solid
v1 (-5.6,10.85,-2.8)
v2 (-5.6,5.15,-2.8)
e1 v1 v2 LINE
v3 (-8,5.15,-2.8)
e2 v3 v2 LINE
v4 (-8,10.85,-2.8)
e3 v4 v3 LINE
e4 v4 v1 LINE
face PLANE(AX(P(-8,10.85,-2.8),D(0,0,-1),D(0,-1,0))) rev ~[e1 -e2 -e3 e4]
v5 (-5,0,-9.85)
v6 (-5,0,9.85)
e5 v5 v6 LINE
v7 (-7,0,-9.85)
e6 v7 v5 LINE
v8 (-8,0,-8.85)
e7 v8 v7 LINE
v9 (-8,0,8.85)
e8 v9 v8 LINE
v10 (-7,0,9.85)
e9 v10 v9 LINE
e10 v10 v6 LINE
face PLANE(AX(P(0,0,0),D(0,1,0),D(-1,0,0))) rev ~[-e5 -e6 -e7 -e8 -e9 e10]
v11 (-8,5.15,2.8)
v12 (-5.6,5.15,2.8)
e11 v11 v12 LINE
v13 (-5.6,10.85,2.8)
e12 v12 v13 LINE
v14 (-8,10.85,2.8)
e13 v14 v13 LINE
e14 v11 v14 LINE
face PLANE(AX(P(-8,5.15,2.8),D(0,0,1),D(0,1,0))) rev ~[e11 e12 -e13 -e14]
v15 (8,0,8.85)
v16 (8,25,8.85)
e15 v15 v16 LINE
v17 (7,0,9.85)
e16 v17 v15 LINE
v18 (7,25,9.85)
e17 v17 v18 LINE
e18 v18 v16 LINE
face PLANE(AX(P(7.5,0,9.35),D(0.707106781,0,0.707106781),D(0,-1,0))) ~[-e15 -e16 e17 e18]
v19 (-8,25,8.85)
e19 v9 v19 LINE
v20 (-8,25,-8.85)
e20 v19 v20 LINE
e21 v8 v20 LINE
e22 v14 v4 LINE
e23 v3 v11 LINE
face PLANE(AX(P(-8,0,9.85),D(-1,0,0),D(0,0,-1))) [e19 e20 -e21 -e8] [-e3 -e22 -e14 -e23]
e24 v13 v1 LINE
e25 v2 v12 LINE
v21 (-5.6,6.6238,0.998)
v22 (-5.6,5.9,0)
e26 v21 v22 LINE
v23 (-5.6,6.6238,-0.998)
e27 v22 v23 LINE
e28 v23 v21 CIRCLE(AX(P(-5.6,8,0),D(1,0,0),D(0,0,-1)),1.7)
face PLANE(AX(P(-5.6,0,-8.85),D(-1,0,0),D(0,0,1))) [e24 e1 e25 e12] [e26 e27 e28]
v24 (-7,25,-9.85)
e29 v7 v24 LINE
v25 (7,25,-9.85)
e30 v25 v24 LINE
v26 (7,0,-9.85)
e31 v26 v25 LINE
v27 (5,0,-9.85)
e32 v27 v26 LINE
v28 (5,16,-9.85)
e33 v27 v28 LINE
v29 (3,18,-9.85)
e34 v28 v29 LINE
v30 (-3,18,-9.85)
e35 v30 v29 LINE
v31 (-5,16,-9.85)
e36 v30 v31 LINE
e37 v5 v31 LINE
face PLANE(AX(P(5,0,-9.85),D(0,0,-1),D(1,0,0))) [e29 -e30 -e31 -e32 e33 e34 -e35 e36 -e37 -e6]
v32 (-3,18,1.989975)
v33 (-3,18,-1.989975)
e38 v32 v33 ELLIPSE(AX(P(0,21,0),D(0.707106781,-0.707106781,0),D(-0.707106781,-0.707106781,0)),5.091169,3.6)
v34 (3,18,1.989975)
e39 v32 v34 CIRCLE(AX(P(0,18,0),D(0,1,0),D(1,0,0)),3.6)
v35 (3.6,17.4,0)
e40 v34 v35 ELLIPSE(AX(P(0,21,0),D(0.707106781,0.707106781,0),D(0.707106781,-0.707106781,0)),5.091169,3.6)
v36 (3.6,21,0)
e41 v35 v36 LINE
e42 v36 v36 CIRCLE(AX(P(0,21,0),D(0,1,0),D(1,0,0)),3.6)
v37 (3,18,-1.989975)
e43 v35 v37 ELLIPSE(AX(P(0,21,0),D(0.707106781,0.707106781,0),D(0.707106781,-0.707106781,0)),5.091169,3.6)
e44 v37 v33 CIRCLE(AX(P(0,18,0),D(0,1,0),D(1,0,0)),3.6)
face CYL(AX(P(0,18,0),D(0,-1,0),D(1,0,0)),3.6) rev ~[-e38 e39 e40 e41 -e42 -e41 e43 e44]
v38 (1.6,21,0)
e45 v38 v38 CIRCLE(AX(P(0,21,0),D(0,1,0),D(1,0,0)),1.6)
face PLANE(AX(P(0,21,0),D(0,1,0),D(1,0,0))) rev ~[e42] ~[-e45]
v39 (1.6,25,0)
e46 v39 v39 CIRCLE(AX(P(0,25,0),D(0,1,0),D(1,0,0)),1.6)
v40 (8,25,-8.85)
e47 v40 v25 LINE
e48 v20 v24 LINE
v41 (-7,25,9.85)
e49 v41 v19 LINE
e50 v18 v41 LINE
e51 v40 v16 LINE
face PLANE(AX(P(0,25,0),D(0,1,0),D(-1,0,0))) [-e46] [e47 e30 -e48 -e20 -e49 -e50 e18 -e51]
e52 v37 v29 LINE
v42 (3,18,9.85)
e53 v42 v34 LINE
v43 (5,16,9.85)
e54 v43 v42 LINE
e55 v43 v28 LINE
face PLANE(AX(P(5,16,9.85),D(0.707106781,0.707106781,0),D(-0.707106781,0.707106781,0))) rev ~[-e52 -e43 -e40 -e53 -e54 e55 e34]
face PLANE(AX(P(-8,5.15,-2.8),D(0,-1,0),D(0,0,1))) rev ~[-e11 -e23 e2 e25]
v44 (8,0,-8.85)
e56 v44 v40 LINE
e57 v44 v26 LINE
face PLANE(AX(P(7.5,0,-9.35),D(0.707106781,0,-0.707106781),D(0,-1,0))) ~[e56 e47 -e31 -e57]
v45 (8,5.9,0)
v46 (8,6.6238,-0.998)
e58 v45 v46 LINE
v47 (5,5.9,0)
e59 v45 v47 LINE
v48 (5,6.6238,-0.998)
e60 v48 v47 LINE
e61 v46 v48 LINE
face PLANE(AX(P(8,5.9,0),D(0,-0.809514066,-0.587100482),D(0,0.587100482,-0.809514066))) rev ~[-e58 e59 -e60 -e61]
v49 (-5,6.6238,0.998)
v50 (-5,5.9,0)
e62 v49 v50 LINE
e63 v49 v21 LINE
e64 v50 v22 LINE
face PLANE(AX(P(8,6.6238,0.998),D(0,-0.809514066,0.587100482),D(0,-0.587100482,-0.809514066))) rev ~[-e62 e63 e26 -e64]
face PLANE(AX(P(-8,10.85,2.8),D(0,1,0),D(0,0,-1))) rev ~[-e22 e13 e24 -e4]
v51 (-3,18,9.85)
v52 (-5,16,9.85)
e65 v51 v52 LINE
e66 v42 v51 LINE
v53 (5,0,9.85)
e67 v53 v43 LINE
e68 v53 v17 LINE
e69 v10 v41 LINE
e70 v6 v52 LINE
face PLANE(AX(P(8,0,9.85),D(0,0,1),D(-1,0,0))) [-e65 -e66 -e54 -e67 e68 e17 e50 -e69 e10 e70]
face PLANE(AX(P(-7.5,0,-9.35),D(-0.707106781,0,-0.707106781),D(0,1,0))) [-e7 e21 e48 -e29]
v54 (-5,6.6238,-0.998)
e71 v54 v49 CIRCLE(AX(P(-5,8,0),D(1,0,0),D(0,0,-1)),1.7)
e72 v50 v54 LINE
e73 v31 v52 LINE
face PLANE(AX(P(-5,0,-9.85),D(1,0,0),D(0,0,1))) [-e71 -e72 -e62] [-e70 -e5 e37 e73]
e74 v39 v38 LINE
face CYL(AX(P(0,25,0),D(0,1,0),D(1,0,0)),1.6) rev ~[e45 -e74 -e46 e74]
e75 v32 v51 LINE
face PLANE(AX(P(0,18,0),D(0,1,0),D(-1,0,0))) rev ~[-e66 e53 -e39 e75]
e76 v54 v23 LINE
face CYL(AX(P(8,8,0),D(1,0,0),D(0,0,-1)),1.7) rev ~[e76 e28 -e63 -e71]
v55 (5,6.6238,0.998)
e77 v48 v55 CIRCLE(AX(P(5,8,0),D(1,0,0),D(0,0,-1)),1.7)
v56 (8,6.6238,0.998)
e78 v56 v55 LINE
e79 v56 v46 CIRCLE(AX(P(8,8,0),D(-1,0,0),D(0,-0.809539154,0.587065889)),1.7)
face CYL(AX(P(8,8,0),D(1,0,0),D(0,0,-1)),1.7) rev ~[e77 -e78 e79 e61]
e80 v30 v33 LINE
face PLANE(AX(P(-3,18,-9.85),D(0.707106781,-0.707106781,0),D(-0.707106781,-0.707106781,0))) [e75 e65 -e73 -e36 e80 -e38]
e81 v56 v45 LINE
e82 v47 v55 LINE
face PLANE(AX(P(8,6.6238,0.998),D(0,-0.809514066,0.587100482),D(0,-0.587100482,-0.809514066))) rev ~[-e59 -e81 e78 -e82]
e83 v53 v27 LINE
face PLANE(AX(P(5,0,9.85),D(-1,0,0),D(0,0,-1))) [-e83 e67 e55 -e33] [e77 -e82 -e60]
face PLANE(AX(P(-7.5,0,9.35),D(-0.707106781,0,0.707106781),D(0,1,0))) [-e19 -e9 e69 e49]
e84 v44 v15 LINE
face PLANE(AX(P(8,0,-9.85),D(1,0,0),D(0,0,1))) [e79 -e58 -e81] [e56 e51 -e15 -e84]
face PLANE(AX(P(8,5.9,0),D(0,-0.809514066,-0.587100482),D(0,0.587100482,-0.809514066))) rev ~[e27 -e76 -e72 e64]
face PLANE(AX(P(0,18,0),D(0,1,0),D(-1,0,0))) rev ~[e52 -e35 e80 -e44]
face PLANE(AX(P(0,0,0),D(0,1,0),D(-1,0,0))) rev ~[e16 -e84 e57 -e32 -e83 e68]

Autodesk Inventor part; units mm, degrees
ref_plane "YZ Plane" through (0, 0, 0) normal (1, 0, 0) x (0, 1, 0)
ref_plane "XZ Plane" through (0, 0, 0) normal (0, 1, 0) x (-1, 0, 0)
ref_plane "XY Plane" through (0, 0, 0) normal (0, 0, 1) x (1, 0, 0)
sketch "Sketch3" plane through (0, 0, 0) normal (0, 1, 0) x (-1, 0, 0)
  line L0 (-8, 9.85) -> (8, 9.85)
  line L1 (8, 9.85) -> (8, -9.85)
  line L2 (8, -9.85) -> (-8, -9.85)
  line L3 (-8, -9.85) -> (-8, 9.85)
  line L4 (-8, 9.85) -> (8, -9.85) construction
  line L5 (8, 9.85) -> (-8, -9.85) construction
  line L6 (5, -9.85) -> (5, 9.85)
  line L7 (-5, 9.85) -> (-5, -9.85)
  line L8 (-5, -6.1562) -> (5, -6.1562) construction
  point P0 (0, 0)
  dimension "d12" = 19.7
  dimension "d36" = 10
  dimension "d52" = 16
extrude "Extrusion3" add sketch "Sketch3" along normal blind 25
sketch "Sketch4" plane through (8, 0, 9.85) normal (1, 0, 0) x (0, 0, -1)
  line L0 (9.85, 0) -> (9.85, 8) construction
  circle A0 centre (9.85, 8) radius 1.7
  line L1 (0, 0) -> (19.7, 0) projected
  line L2 (9.85, 5.9) -> (10.848, 6.6238)
  line L3 (8.852, 6.6238) -> (9.85, 5.9)
  dimension "d15" = 3.4
  dimension "d16" = 8
  dimension "d53" = 2.1
extrude "Extrusion4" cut sketch "Sketch3" along normal blind 18 contours L0 L6 L2 L7
extrude "Extrusion5" cut sketch "Sketch4" against normal through all
sketch "Sketch7" plane through (0, 25, 0) normal (0, 1, 0) x (1, 0, 0)
  circle A0 centre (0, 0) radius 1.6
  circle A1 centre (0, 0) radius 3.6
  line L0 (-5, 10) -> (5, -10) construction
  line L1 (8, 9.85) -> (-8, 9.85) projected
  line L2 (-8, 9.85) -> (-8, -9.85) projected
  line L3 (-8, -9.85) -> (8, -9.85) projected
  line L4 (8, -9.85) -> (8, 9.85) projected
  line L5 (-8, 9.85) -> (8, -9.85) construction
  line L6 (8, 9.85) -> (-8, -9.85) construction
  dimension "d30" = 3.2
  dimension "d47" = 7.2
extrude "Extrusion8" cut sketch "Sketch7" along normal through all both and the other way through all contours A0
extrude "Extrusion9" cut sketch "Sketch7" along normal blind 3 from surface at -7 contours A1
chamfer "Chamfer2" distance 2 angle 45 2 edges at (5, 18, 0) (-5, 18, 0)
chamfer "Chamfer3" distance 1 angle 45 4 edges at (-8, 12.5, 9.85) (-8, 12.5, -9.85) (8, 12.5, -9.85) (8, 12.5, 9.85)
sketch "Sketch9" plane through (-8, 0, -8.85) normal (-1, 0, 0) x (0, 0, 1)
  arc A0 (9.848, 6.6238) -> (7.852, 6.6238) centre (8.85, 8) ccw projected
  line L0 (6.05, 5.15) -> (11.65, 5.15)
  line L1 (11.65, 5.15) -> (11.65, 10.85)
  line L2 (11.65, 10.85) -> (6.05, 10.85)
  line L3 (6.05, 10.85) -> (6.05, 5.15)
  line L4 (6.05, 5.15) -> (11.65, 10.85) construction
  line L5 (11.65, 5.15) -> (6.05, 10.85) construction
  point P0 (8.85, 0)
  dimension "d57" = 5.6
  dimension "d58" = 5.7
extrude "Extrusion10" cut sketch "Sketch9" against normal blind 2.4
properties part number "Idlert Tensioner_3DPrint"
